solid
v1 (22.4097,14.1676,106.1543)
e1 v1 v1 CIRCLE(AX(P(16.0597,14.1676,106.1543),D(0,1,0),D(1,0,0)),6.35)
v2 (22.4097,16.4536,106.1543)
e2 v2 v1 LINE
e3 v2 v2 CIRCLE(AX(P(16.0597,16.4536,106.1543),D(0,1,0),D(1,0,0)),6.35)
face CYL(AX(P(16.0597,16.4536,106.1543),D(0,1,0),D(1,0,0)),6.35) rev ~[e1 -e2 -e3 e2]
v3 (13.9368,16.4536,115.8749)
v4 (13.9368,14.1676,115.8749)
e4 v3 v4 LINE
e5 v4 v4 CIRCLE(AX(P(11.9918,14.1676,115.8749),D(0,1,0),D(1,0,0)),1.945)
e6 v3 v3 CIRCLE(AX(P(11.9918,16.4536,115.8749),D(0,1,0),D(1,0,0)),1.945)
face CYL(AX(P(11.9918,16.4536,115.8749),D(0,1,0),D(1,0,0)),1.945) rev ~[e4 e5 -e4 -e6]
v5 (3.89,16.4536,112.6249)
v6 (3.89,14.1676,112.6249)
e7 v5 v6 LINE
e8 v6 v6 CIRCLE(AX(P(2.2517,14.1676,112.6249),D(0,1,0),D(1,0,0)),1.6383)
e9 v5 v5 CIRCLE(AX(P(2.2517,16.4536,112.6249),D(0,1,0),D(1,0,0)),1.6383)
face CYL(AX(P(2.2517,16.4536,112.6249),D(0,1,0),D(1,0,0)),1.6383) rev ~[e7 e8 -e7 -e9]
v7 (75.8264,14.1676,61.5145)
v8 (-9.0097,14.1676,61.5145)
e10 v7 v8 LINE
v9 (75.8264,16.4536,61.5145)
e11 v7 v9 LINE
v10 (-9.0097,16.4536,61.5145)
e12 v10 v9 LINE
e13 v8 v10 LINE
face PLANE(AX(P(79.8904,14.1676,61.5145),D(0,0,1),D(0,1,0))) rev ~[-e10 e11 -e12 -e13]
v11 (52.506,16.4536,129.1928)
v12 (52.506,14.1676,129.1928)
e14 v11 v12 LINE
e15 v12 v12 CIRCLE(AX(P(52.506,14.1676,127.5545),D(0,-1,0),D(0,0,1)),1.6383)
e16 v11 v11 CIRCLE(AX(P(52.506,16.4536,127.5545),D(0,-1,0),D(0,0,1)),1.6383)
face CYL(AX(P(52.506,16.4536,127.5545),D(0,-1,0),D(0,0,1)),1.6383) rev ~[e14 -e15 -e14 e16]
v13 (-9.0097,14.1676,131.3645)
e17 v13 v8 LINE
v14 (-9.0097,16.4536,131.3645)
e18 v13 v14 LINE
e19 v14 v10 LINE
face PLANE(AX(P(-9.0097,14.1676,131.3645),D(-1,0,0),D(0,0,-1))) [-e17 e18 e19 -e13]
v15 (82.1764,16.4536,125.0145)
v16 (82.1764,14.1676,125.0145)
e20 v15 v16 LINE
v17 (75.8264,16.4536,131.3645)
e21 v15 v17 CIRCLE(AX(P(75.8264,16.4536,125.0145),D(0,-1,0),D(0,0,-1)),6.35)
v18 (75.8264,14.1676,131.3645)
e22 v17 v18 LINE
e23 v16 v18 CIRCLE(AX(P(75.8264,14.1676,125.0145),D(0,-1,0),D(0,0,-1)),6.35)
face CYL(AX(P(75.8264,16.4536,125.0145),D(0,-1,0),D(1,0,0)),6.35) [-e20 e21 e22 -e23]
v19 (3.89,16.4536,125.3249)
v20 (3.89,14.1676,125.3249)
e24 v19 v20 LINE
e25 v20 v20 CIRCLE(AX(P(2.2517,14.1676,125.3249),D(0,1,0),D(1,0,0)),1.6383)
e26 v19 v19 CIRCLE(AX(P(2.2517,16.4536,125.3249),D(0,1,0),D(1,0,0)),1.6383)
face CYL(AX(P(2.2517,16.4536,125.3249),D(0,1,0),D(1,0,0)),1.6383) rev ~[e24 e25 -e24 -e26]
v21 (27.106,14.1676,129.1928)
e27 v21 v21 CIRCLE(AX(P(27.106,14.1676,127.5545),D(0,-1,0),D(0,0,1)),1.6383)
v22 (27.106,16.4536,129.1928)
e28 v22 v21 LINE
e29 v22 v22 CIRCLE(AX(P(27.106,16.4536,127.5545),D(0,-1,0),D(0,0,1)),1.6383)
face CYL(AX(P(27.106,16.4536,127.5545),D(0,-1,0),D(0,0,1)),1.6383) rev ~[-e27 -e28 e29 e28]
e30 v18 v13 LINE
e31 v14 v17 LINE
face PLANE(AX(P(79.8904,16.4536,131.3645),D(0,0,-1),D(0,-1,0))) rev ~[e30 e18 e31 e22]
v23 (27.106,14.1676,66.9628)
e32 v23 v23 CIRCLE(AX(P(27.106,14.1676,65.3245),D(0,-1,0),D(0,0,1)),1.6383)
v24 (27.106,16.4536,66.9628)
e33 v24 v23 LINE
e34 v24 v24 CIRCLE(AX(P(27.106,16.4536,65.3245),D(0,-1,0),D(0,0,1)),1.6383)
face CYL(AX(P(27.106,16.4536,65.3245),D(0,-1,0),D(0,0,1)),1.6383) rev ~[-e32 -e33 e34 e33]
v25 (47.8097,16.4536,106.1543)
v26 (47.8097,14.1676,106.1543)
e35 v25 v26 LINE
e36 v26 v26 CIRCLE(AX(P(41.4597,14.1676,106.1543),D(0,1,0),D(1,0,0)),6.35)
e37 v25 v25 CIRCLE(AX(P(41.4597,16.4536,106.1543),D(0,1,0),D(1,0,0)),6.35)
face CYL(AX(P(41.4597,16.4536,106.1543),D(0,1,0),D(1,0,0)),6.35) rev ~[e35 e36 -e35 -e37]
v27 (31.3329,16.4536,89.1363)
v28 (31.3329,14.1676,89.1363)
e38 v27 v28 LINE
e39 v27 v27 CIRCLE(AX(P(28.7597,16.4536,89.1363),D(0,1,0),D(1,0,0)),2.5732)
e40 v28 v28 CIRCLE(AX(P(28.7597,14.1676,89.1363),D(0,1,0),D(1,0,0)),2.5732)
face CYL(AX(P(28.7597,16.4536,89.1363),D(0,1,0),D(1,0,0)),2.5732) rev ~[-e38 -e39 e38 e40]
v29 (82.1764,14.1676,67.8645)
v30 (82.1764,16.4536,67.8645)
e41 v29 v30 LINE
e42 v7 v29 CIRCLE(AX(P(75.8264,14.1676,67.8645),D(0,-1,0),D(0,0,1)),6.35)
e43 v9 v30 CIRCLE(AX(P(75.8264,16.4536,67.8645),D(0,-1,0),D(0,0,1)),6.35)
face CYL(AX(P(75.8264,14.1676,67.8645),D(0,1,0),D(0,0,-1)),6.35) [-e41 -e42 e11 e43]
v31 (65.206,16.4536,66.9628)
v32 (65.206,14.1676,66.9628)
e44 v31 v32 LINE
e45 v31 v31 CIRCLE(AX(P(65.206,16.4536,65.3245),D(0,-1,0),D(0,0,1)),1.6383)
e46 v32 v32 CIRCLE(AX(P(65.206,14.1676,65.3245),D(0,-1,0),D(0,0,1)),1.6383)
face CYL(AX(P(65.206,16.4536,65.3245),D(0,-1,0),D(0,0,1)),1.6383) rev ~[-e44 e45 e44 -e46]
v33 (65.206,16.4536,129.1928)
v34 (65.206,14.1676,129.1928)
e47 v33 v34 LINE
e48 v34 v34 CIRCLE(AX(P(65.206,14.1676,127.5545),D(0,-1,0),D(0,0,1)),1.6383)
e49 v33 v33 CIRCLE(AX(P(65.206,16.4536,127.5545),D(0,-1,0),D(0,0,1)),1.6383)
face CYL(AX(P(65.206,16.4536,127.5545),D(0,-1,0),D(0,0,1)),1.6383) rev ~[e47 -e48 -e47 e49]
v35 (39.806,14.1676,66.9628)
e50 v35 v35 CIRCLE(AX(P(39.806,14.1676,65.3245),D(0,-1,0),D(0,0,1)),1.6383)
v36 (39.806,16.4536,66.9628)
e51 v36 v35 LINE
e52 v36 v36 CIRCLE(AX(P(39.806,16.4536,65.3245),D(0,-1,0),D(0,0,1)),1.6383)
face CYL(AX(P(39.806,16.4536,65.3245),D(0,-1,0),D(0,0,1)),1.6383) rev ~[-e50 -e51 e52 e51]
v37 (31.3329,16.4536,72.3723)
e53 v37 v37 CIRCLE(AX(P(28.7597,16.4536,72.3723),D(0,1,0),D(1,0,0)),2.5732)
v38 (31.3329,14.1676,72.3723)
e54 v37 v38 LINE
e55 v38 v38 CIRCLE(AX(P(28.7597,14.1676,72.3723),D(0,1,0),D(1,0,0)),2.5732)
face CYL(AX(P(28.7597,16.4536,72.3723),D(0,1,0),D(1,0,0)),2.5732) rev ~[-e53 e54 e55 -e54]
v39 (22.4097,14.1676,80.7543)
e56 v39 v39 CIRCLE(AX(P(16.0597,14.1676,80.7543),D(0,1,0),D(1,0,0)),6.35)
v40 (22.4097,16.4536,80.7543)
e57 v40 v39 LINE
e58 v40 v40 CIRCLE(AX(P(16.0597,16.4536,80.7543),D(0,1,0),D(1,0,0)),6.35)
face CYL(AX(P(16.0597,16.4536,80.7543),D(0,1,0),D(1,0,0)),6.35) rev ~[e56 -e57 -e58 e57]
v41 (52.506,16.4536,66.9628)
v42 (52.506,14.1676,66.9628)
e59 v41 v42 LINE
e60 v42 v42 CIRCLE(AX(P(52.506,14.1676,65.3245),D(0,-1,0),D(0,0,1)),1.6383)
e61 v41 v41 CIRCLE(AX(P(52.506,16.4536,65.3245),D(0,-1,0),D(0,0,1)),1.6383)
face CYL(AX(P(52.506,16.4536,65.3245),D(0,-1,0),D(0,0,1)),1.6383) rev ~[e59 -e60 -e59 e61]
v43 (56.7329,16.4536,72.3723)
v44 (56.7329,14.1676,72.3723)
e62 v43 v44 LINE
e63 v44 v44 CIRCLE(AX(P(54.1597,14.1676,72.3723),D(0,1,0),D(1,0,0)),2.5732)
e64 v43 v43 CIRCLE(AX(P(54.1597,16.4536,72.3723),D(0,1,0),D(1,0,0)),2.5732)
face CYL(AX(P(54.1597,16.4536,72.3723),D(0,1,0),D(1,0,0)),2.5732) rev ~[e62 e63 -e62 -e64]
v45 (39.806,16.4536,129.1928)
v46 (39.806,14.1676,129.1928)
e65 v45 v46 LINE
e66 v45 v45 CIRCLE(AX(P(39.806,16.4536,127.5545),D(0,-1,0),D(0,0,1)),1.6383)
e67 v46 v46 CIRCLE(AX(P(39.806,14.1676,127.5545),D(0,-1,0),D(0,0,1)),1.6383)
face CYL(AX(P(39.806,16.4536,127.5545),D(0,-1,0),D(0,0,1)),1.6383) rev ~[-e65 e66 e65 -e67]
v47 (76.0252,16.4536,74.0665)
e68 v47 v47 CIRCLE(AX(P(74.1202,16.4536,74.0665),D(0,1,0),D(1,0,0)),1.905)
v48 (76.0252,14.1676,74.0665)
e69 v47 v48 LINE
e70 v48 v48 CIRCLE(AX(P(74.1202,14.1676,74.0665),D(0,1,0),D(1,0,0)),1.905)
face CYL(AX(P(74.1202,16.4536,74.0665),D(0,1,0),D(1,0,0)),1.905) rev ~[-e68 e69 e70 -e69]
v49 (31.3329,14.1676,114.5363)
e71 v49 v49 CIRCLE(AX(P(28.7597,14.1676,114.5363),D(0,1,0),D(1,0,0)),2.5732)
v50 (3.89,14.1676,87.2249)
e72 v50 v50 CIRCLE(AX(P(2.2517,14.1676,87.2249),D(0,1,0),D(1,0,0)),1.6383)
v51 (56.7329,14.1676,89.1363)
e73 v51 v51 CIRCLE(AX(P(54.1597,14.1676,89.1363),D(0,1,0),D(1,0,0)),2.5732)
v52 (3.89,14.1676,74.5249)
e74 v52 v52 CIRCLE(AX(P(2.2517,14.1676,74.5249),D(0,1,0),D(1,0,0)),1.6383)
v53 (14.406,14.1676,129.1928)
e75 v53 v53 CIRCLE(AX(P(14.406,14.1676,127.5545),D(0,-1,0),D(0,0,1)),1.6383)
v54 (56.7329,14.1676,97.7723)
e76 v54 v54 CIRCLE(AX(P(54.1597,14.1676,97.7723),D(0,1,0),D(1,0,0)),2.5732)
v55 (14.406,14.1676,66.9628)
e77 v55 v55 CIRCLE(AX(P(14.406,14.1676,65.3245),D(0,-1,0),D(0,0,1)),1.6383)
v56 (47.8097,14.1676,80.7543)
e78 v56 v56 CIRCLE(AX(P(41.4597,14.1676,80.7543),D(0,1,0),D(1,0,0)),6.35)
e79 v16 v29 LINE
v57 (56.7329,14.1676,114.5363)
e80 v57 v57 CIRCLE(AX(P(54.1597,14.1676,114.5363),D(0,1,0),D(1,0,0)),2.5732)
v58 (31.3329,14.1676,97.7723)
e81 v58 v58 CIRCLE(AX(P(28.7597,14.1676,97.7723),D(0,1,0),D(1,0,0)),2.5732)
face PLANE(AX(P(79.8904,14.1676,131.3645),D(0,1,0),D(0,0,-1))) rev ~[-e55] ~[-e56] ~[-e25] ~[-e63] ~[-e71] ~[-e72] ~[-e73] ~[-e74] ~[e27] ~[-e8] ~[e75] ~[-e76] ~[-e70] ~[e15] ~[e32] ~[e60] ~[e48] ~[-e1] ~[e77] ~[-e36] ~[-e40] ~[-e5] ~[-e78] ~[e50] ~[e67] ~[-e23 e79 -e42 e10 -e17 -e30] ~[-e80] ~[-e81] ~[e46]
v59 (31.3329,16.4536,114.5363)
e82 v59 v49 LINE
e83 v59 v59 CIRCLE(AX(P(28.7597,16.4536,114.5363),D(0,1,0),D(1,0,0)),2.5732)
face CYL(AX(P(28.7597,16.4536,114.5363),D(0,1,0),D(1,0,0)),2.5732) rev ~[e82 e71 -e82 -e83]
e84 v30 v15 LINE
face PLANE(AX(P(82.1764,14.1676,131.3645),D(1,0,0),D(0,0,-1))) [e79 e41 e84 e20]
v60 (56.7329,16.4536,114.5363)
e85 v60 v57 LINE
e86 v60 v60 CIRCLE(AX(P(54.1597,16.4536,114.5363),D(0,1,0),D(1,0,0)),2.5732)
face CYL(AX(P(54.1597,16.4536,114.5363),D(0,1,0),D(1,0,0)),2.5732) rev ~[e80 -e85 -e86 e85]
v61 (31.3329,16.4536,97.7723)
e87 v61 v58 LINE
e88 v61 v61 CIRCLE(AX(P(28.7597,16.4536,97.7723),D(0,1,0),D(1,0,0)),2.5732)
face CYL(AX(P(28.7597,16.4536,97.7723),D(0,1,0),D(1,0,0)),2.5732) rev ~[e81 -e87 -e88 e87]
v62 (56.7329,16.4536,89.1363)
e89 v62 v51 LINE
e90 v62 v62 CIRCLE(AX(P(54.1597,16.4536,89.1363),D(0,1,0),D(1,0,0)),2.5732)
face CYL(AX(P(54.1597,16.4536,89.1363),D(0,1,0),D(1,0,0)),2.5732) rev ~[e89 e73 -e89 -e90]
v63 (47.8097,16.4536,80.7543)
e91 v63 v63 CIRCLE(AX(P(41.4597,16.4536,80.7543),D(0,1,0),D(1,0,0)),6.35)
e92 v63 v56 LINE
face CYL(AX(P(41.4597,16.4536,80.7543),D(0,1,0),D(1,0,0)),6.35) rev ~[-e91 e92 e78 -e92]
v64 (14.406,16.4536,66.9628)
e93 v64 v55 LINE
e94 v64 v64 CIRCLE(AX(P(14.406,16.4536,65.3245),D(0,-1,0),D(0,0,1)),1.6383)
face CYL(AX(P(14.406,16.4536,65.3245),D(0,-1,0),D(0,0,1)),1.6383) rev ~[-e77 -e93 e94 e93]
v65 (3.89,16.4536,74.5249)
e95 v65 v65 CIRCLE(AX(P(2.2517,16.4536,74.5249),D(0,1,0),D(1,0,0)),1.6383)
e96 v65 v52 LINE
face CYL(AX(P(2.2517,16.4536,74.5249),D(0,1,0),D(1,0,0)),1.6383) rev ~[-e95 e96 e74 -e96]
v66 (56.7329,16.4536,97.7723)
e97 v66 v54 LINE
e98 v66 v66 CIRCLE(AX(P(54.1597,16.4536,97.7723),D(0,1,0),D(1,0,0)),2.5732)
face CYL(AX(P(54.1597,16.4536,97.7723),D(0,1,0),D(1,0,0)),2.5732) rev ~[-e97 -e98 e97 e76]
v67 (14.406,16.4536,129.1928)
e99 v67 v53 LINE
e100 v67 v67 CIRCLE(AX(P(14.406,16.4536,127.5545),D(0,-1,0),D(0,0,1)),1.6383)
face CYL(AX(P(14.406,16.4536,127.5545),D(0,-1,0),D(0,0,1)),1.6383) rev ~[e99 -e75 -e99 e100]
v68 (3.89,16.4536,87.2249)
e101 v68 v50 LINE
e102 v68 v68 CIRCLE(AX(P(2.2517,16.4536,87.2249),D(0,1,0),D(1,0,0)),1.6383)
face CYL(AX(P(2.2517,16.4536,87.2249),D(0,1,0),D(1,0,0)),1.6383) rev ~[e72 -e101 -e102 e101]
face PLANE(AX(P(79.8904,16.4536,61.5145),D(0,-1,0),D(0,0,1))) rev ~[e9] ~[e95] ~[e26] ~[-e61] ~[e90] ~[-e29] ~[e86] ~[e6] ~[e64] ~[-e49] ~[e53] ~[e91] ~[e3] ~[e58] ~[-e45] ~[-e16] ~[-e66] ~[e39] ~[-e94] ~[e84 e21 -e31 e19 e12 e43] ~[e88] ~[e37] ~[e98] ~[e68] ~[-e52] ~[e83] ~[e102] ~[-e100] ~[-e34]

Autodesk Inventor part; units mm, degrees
ref_plane "YZ Plane" through (0, 0, 0) normal (1, 0, 0) x (0, 1, 0)
ref_plane "XZ Plane" through (0, 0, 0) normal (0, 1, 0) x (-1, 0, 0)
ref_plane "Work Plane1" through (-2.7575, 14.1676, 33.7809) normal (0, 1, 0) x (1, 0, 0)
sketch "Sketch1" plane through (-2.7575, 14.1676, 33.7809) normal (0, 1, 0) x (1, 0, 0)
  line L0 (-6.2522, -27.7336) -> (82.6478, -27.7336)
  line L1 (82.6478, -27.7336) -> (82.6478, -97.5836)
  line L2 (82.6478, -97.5836) -> (-6.2522, -97.5836)
  line L3 (-6.2522, -97.5836) -> (-6.2522, -27.7336)
  point P0 (2.7575, 33.7809)
  dimension "d0" = 69.85
  dimension "d1" = 88.9
extrude "Extrusion1" add sketch "Sketch1" along normal blind 2.286
sketch "Sketch2" plane through (-2.7575, 16.4536, 33.7809) normal (0, 1, 0) x (1, 0, 0)
  line L0 (82.6478, -27.7336) -> (-6.2522, -27.7336) projected
  line L1 (-6.2522, -27.7336) -> (-6.2522, -97.5836) projected
  line L2 (-6.2522, -97.5836) -> (82.6478, -97.5836) projected
  line L3 (82.6478, -97.5836) -> (82.6478, -27.7336) projected
  circle A0 centre (5.0092, 73.556) radius 1.6383
  circle A1 centre (5.0092, 60.856) radius 1.6383
  circle A2 centre (5.0092, -2.644) radius 1.6383
  circle A3 centre (5.0092, -78.844) radius 1.6383
  circle A4 centre (5.0092, -91.544) radius 1.6383
  circle A5 centre (5.0092, -40.744) radius 1.6383
  circle A6 centre (5.0092, -53.444) radius 1.6383
  circle A7 centre (5.0092, 10.056) radius 1.6383
extrude "Extrusion2" cut sketch "Sketch2" against normal blind 2.286 contours A0 | A1 | A2 | A3 | A4 | A5 | A6 | A7
sketch "Sketch3" plane through (-2.7575, 16.4536, 33.7809) normal (0, 1, 0) x (1, 0, 0)
  line L0 (82.6478, -97.5836) -> (-6.2522, -97.5836) projected
  line L1 (82.6478, -27.7336) -> (-6.2522, -27.7336) projected
  point P0 (2.7575, 33.7809)
  point P1 (17.1634, -31.5436)
  point P2 (17.1634, -93.7736)
  dimension "d7" = 3.81
  dimension "d8" = 3.81
hole "Hole1" at (14.406, 16.4536, 65.3245) at (14.406, 16.4536, 127.5545) direction (0, -1, 0) diameter 3.2766 depth 2.286 tip angle 118
pattern_linear "Rectangular Pattern1" count 5 spacing 12.7 along (1, 0, 0) of "Hole1"
sketch "Sketch6" plane through (79.8904, 14.1676, 131.3645) normal (1, 0, 0) x (0, 0, -1)
  line L0 (69.85, 2.286) -> (0, 2.286)
  line L1 (0, 2.286) -> (0, 0)
  line L2 (0, 0) -> (69.85, 0)
  line L3 (69.85, 0) -> (69.85, 2.286)
  point P0 (131.3645, -14.1676)
extrude "Extrusion4" add sketch "Sketch6" along normal blind 2.286
fillet "Fillet2" radius 6.35 2 edges at (82.1764, 15.3106, 131.3645) (82.1764, 15.3106, 61.5145)
sketch "Sketch7" plane through (-2.7575, 16.4536, 33.7809) normal (0, 1, 0) x (1, 0, 0)
  circle A0 centre (14.7493, -82.094) radius 1.945
  circle A1 centre (76.8777, -40.2856) radius 1.905
  point P0 (2.7575, 33.7809)
extrude "Extrusion5" cut sketch "Sketch7" against normal blind 2.286
sketch "Sketch8" plane through (-2.7575, 16.4536, 33.7809) normal (0, 1, 0) x (1, 0, 0)
  circle A0 centre (18.8172, -46.9734) radius 6.35
  circle A1 centre (31.5172, -38.5914) radius 2.5732
  circle A2 centre (31.5172, -55.3554) radius 2.5732
  point P0 (2.7575, 33.7809)
  dimension "d27" = 12.7
  dimension "d33" = 12.7
  dimension "d34" = 8.382
  dimension "d35" = 8.382
extrude "Extrusion6" cut sketch "Sketch8" against normal blind 25.4
pattern_linear "Rectangular Pattern2" count 2 spacing 25.4 along (1, 0, 0) count 2 spacing 25.4 along (0, 0, 1) of "Extrusion6"
equation "\"d8\" = d7"
equation "\"d35\" = d34"
properties part number "talon plate short"
